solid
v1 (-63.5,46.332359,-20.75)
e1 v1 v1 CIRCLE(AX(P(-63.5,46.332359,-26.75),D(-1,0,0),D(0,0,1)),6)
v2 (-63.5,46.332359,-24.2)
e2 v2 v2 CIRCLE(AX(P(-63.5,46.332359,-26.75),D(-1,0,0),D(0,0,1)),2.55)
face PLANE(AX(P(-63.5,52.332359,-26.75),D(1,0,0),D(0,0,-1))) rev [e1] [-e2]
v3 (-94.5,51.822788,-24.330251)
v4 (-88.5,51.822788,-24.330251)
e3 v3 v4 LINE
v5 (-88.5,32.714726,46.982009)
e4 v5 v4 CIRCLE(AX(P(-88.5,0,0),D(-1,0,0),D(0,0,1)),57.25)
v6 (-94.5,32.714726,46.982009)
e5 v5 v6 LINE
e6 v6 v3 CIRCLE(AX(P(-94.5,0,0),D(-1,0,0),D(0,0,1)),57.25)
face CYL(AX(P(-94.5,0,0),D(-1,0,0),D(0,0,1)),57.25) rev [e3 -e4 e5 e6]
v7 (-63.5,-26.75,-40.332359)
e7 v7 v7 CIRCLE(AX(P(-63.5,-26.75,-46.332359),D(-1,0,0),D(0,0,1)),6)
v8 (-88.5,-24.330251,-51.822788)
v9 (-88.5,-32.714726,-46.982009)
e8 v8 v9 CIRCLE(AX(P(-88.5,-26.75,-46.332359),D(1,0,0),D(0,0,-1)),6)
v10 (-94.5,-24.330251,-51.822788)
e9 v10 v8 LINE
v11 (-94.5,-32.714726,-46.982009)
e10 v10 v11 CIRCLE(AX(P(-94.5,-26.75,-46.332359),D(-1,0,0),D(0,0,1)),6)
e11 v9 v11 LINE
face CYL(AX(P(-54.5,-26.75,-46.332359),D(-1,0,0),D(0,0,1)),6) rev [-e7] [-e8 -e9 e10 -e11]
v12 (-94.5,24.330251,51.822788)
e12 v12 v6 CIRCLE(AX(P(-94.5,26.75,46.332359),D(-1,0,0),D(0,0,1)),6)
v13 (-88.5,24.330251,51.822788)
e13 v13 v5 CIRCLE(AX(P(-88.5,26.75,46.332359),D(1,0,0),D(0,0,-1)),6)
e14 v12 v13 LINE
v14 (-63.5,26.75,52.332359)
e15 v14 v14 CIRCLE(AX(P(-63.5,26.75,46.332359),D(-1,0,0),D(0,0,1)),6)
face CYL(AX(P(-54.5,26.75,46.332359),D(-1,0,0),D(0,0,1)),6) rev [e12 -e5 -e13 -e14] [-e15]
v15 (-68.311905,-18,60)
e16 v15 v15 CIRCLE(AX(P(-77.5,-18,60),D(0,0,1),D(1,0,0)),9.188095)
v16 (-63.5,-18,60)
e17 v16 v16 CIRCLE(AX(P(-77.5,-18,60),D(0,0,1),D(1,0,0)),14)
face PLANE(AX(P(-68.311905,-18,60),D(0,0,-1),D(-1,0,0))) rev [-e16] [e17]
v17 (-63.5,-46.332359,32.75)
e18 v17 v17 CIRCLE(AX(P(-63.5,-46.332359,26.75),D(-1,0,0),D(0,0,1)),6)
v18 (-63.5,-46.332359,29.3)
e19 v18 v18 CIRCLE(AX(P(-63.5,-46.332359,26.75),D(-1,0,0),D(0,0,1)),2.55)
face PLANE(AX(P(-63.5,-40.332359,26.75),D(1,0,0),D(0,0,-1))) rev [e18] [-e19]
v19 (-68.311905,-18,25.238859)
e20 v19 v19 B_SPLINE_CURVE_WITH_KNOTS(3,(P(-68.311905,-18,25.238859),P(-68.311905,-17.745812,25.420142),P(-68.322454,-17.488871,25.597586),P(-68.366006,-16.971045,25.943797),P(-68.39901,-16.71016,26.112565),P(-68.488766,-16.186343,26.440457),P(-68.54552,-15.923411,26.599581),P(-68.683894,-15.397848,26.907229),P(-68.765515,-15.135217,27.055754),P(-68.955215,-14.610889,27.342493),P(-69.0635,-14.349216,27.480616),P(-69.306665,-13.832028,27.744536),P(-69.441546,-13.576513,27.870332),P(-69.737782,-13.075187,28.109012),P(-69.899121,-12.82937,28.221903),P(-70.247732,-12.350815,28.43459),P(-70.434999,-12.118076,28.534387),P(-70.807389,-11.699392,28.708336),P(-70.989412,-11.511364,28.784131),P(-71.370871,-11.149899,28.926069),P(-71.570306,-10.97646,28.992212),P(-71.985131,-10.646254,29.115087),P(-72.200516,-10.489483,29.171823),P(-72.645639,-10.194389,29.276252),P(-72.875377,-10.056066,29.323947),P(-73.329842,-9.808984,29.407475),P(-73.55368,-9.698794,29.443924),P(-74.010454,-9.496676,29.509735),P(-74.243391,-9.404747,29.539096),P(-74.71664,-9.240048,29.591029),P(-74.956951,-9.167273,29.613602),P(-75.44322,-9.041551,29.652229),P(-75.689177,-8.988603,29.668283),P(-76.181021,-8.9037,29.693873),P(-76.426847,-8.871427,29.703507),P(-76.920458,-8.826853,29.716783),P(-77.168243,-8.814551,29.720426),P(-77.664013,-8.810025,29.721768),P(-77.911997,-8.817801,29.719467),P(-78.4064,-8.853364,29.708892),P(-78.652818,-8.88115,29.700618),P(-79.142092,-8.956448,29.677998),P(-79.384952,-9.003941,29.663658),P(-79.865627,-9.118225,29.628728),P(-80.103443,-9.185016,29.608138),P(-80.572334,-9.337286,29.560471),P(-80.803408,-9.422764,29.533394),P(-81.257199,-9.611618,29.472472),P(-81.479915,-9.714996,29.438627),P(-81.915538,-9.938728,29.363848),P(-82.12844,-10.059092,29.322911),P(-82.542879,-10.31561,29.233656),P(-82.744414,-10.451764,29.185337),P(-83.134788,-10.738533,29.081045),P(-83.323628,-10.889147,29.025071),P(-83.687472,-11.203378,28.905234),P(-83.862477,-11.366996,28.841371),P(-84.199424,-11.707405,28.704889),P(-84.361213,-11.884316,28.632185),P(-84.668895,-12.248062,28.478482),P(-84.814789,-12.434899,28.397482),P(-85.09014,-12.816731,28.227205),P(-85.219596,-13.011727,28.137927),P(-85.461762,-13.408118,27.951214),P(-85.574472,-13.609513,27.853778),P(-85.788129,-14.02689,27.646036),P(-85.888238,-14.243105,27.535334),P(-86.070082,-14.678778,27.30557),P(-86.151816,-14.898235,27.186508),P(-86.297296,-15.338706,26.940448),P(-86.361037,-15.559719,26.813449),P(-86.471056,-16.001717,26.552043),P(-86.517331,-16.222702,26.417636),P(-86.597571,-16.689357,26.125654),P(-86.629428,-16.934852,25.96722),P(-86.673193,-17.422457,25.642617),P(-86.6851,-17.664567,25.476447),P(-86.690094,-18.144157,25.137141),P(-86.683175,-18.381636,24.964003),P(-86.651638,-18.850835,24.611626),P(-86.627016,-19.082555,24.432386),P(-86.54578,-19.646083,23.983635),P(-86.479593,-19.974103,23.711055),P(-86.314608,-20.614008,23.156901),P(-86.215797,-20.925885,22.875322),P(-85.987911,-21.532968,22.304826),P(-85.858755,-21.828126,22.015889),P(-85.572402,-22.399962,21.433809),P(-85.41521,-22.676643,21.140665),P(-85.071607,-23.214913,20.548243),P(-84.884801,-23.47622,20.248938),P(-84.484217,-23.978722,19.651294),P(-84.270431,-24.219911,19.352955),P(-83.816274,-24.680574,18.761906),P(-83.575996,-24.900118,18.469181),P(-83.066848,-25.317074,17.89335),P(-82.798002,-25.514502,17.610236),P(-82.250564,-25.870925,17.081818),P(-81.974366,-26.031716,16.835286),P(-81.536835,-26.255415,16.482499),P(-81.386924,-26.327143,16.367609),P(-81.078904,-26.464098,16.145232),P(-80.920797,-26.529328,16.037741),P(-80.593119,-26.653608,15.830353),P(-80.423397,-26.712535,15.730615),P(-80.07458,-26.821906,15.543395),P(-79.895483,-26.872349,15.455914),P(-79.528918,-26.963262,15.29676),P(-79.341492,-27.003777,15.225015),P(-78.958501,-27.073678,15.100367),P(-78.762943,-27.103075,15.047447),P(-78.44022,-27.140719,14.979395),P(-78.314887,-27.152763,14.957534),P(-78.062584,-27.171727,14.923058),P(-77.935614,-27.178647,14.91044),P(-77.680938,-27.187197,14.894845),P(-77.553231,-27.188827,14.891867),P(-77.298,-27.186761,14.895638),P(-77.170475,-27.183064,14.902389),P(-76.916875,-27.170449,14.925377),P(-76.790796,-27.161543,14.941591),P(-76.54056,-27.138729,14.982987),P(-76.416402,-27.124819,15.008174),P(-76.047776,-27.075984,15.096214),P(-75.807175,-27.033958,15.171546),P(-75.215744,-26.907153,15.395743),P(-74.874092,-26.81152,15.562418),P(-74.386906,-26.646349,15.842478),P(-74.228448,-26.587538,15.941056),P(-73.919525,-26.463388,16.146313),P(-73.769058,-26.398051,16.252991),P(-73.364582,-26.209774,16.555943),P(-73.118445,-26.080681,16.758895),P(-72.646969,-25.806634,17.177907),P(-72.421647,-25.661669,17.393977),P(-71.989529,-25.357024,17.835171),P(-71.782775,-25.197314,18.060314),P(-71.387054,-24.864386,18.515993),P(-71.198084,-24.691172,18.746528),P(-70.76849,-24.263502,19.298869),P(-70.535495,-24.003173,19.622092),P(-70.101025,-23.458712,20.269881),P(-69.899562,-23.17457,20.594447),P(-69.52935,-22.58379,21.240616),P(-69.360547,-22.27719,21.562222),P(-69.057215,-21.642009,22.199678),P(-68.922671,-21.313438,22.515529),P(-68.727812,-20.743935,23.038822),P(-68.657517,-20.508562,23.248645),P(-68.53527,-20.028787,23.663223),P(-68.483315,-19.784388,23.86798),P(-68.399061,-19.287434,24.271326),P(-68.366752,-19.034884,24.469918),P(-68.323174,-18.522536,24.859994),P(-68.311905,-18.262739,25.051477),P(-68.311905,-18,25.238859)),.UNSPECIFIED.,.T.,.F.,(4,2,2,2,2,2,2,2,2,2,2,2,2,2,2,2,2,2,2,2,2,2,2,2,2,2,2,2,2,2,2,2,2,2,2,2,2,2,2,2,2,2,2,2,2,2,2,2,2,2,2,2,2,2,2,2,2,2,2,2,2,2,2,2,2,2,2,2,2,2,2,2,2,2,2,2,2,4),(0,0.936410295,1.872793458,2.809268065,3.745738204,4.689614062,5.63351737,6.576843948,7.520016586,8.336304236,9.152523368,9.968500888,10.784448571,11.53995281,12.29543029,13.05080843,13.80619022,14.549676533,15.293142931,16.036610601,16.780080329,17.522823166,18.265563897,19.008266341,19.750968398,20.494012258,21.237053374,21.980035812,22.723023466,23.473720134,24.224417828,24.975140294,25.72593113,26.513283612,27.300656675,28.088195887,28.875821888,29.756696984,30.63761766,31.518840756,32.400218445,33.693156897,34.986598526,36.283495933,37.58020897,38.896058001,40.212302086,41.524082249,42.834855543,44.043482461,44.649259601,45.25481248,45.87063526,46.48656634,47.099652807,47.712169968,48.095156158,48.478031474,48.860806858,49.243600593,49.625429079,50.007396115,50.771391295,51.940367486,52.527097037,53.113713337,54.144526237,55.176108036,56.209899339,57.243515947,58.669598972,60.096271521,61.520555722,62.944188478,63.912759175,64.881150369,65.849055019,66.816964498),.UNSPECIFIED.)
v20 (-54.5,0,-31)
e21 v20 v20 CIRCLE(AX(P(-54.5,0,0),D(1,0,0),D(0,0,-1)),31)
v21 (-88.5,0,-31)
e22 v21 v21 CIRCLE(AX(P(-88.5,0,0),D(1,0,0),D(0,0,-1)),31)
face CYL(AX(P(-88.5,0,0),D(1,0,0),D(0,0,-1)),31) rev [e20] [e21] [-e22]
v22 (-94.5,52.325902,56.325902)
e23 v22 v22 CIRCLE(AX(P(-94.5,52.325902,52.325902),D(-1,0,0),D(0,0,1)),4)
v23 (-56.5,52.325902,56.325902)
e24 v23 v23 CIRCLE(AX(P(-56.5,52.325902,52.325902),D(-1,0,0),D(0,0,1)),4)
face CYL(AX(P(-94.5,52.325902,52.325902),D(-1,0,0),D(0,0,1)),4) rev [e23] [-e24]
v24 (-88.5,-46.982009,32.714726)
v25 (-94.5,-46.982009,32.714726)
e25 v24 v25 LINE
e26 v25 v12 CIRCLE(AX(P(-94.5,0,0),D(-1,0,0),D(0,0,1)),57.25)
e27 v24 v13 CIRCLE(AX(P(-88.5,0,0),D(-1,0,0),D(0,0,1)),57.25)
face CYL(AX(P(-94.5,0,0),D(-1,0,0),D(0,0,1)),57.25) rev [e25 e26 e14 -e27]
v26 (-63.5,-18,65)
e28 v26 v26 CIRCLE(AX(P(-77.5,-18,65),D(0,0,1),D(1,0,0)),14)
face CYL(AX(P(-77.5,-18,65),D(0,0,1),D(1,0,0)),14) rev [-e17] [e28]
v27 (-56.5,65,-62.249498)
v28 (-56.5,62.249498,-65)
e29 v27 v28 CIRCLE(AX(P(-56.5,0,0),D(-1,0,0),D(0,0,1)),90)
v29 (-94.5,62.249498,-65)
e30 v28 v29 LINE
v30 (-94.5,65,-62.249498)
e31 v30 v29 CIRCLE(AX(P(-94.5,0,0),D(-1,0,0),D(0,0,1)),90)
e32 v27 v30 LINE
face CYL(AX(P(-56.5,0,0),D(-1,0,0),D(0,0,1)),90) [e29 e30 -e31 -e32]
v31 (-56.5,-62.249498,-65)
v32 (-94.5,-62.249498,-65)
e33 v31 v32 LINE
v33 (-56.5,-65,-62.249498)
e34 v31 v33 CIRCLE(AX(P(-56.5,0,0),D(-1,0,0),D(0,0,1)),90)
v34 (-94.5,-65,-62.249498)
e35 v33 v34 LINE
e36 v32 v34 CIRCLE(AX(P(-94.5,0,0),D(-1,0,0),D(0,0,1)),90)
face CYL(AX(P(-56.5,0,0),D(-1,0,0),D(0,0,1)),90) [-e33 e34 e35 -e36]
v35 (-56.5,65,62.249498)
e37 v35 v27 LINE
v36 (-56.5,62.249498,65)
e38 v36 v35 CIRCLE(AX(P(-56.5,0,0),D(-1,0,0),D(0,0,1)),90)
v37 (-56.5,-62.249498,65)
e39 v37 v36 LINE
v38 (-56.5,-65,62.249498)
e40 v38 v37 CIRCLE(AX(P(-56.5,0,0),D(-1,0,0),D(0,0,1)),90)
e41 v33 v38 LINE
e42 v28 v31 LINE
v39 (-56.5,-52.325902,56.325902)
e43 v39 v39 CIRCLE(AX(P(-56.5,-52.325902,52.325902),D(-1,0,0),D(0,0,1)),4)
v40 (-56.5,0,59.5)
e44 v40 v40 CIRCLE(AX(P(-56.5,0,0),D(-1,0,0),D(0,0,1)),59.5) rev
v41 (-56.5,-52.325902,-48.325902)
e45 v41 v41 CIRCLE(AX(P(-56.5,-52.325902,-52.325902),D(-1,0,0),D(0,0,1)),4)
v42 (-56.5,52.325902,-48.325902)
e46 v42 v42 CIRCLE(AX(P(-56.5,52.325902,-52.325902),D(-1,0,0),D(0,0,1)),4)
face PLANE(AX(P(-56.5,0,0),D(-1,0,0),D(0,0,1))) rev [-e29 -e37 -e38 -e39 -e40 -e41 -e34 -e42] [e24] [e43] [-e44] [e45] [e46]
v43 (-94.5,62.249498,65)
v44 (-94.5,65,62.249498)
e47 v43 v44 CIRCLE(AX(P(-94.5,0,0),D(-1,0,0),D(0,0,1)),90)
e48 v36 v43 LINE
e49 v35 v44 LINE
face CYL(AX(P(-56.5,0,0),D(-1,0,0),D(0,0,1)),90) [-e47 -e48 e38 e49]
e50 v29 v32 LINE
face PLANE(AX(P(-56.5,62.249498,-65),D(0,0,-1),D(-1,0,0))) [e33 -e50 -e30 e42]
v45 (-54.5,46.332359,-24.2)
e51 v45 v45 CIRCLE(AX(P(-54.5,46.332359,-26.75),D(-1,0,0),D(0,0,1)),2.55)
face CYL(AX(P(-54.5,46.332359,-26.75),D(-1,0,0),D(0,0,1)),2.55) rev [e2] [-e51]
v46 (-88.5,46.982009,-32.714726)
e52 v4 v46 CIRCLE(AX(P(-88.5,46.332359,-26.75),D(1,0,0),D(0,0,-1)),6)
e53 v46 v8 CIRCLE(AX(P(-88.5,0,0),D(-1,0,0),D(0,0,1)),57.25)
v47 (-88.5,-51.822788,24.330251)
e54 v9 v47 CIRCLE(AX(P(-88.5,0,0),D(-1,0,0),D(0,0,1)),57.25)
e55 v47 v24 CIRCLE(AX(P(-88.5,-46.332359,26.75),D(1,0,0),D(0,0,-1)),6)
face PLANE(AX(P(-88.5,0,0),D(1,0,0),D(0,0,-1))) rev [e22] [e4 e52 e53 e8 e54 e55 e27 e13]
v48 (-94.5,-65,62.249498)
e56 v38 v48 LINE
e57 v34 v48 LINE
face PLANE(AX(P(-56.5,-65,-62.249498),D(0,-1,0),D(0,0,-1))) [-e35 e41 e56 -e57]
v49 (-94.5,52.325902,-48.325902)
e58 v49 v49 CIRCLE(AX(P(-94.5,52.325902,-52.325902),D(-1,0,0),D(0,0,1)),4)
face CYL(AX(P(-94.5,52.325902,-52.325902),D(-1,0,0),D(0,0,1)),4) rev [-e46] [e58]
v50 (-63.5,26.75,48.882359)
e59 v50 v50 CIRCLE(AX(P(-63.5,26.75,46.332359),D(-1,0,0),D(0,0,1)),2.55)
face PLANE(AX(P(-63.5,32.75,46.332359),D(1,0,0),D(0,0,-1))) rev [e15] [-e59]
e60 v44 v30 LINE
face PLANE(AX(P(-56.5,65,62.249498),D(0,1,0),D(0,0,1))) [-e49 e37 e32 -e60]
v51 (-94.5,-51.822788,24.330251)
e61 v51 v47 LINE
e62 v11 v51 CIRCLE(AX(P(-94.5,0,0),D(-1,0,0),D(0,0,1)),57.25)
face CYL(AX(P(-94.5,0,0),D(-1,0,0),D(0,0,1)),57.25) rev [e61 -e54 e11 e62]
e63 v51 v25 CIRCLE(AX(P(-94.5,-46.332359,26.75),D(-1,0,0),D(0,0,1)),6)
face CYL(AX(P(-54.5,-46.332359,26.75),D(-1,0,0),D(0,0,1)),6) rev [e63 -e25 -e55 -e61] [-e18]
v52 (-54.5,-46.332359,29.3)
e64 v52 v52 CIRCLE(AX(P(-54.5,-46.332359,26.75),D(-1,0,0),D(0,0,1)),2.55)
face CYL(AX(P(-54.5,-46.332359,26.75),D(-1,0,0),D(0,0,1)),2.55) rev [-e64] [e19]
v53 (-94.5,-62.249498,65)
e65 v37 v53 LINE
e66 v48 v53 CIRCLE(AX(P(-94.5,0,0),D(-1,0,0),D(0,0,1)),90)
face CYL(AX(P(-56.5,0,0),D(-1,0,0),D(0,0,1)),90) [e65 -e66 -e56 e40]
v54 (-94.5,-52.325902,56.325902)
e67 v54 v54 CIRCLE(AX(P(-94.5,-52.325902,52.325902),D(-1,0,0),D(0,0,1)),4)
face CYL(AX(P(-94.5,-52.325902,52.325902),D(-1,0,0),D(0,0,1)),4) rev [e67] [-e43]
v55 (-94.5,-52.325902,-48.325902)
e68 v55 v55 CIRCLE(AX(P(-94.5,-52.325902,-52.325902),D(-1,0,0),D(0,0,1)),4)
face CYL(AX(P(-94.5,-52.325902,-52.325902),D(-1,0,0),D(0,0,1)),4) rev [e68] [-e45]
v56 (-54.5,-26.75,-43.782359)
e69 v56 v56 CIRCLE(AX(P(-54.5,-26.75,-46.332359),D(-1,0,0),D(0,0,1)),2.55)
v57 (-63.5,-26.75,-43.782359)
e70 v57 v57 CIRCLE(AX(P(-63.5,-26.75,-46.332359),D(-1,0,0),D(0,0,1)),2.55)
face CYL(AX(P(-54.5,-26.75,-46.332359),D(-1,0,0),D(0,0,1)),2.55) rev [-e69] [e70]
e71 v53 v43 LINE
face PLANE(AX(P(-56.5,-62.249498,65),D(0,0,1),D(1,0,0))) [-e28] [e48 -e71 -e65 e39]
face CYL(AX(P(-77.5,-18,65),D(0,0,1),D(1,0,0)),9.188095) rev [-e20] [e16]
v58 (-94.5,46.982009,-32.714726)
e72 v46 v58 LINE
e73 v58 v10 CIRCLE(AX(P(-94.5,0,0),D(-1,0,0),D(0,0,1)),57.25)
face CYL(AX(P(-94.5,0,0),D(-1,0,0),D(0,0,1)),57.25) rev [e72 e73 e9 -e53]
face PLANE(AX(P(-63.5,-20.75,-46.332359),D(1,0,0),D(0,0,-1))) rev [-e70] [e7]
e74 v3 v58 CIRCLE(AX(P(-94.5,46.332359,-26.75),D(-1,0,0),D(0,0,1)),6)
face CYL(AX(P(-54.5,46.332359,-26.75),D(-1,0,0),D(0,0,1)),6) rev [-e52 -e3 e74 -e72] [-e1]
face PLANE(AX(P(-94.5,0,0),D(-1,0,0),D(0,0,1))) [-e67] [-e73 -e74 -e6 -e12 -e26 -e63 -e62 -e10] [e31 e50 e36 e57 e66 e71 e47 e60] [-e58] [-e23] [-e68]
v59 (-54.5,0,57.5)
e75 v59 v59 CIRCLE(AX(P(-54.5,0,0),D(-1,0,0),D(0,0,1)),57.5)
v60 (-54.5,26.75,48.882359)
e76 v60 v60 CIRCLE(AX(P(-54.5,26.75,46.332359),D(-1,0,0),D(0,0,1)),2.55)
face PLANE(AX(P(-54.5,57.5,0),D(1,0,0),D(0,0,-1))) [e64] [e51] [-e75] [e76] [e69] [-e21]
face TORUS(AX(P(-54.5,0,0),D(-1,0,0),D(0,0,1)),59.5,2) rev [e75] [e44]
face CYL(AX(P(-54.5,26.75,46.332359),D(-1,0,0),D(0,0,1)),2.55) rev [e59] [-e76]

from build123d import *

# Parameters (mm, degrees)
SALIENTE_EXTRUIR1_DEPTH            = 38
TALADRO_DE_MARGEN_PARA_M1001_D     = 114.5
TALADRO_DE_MARGEN_PARA_M1001_DEPTH = 6
CROQUIS9_W                         = 34
CROQUIS9_H                         = 31
TALADRO_DE_MARGEN_PARA_M71_D       = 8


# Read off the part's stored shape, not the designer's step: Refrentado para perno con cabeza hexagonal de M161
with BuildPart() as part:
    # Croquis1 → Saliente-Extruir1 (new body)
    with BuildSketch(Plane(origin=(-94.5, 0, 0), x_dir=(0, -1, 0), z_dir=(-1, 0, 0))):
        with BuildLine():
            Line((62.24949799, 65), (-62.24949799, 65))
            ThreePointArc((-62.24949799, 65), (-63.639610307, 63.639610307), (-65, 62.24949799))
            Line((-65, 62.24949799), (-65, -62.24949799))
            ThreePointArc((-65, -62.24949799), (-63.639610307, -63.639610307), (-62.24949799, -65))
            Line((-62.24949799, -65), (62.24949799, -65))
            ThreePointArc((62.24949799, -65), (63.639610307, -63.639610307), (65, -62.24949799))
            Line((65, -62.24949799), (65, 62.24949799))
            ThreePointArc((65, 62.24949799), (63.639610307, 63.639610307), (62.24949799, 65))
        make_face()
    extrude(amount=-SALIENTE_EXTRUIR1_DEPTH)

    # Taladro de margen para M1001
    with Locations(Plane.ZY.offset(94.5)):
        with Locations((0, 0)):
            Hole(TALADRO_DE_MARGEN_PARA_M1001_D / 2, depth=TALADRO_DE_MARGEN_PARA_M1001_DEPTH)

    # Croquis4 → Revolución1 (revolve)
    with BuildSketch(Plane(origin=(0, 0, 0), x_dir=(-1, 0, 0), z_dir=(0, 0, -1)), mode=Mode.PRIVATE) as revoluci_n1_sk:
        with BuildLine():
            Line((54.5, 57.5), (54.5, 0))
            Line((54.5, 0), (56.5, 0))
            Line((56.5, 0), (56.5, 59.5))
            ThreePointArc((56.5, 59.5), (55.914213562, 58.085786438), (54.5, 57.5))
        make_face()
    revolve(revoluci_n1_sk.sketch.rotate(Axis((-54.499975, 0, 0), (-1, 0, 0)), 270), axis=Axis((-54.499975, 0, 0), (-1, 0, 0)))

    # Croquis5 → Cortar-Revolución1 (revolve, cut)
    with BuildSketch(Plane(origin=(0, 0, 46.3323591), x_dir=(-1, 0, 0), z_dir=(0, 0, -1)), mode=Mode.PRIVATE) as cortar_revoluci_n1_sk:
        Polygon((54.5, 29.3), (54.5, 26.75), (94.5, 26.75), (94.5, 32.75), (63.5, 32.75), (63.5, 29.3), align=None)
    revolve(cortar_revoluci_n1_sk.sketch.rotate(Axis((-54.5, 26.75, 46.3323591), (-1, 0, 0)), 270), axis=Axis((-54.5, 26.75, 46.3323591), (-1, 0, 0)), mode=Mode.SUBTRACT)

    # Croquis6 → Cortar-Revolución2 (revolve, cut)
    with BuildSketch(Plane(origin=(0, 0, -26.75), x_dir=(-1, 0, 0), z_dir=(0, 0, -1)), mode=Mode.PRIVATE) as cortar_revoluci_n2_sk:
        Polygon((54.5, 48.8823591), (54.5, 46.3323591), (94.5, 46.3323591), (94.5, 52.3323591), (63.5, 52.3323591), (63.5, 48.8823591), align=None)
    revolve(cortar_revoluci_n2_sk.sketch.rotate(Axis((-54.5, 46.3323591, -26.75), (-1, 0, 0)), 270), axis=Axis((-54.5, 46.3323591, -26.75), (-1, 0, 0)), mode=Mode.SUBTRACT)

    # Croquis7 → Cortar-Revolución3 (revolve, cut)
    with BuildSketch(Plane(origin=(0, 0, -46.3323591), x_dir=(-1, 0, 0), z_dir=(0, 0, -1)), mode=Mode.PRIVATE) as cortar_revoluci_n3_sk:
        Polygon((54.5, -24.2), (54.5, -26.75), (94.5, -26.75), (94.5, -20.75), (63.5, -20.75), (63.5, -24.2), align=None)
    revolve(cortar_revoluci_n3_sk.sketch.rotate(Axis((-54.5, -26.75, -46.3323591), (-1, 0, 0)), 270), axis=Axis((-54.5, -26.75, -46.3323591), (-1, 0, 0)), mode=Mode.SUBTRACT)

    # Croquis8 → Cortar-Revolución4 (revolve, cut)
    with BuildSketch(Plane(origin=(0, 0, 26.75), x_dir=(-1, 0, 0), z_dir=(0, 0, -1)), mode=Mode.PRIVATE) as cortar_revoluci_n4_sk:
        Polygon((54.5, -43.7823591), (54.5, -46.3323591), (94.5, -46.3323591), (94.5, -40.3323591), (63.5, -40.3323591), (63.5, -43.7823591), align=None)
    revolve(cortar_revoluci_n4_sk.sketch.rotate(Axis((-54.5, -46.3323591, 26.75), (-1, 0, 0)), 270), axis=Axis((-54.5, -46.3323591, 26.75), (-1, 0, 0)), mode=Mode.SUBTRACT)

    # Croquis9 → Cortar-Revolución5 (revolve, cut)
    with BuildSketch(Plane.XY, mode=Mode.PRIVATE) as cortar_revoluci_n5_sk:
        with Locations((-71.5, 15.5)):
            Rectangle(CROQUIS9_W, CROQUIS9_H)
    revolve(cortar_revoluci_n5_sk.sketch.rotate(Axis((-88.5, 0, 0), (1, 0, 0)), 270), axis=Axis((-88.5, 0, 0), (1, 0, 0)), mode=Mode.SUBTRACT)

    # Refrentado para perno con cabeza hex 2 → Refrentado para perno con cabeza hexagonal de M161 (revolve, cut)
    with BuildSketch(Plane(origin=(-77.5, -18, 0), x_dir=(1, 0, 0), z_dir=(0, -1, 0))):
        Polygon((0, 14.891701752), (9.188095, 14.891701752), (9.188095, 60), (14, 60), (14, 65), (0, 65), align=None)
    revolve(axis=Axis((-77.5, -18, 0), (0, 0, 1)), mode=Mode.SUBTRACT)

    # Taladro de margen para M71 (through all)
    with Locations(Plane.ZY.offset(94.5)):
        with Locations((-52.325901808, 52.325901808), (52.325901808, 52.325901808), (52.325901808, -52.325901808), (-52.325901808, -52.325901808)):
            Hole(TALADRO_DE_MARGEN_PARA_M71_D / 2)


solid = part.part
